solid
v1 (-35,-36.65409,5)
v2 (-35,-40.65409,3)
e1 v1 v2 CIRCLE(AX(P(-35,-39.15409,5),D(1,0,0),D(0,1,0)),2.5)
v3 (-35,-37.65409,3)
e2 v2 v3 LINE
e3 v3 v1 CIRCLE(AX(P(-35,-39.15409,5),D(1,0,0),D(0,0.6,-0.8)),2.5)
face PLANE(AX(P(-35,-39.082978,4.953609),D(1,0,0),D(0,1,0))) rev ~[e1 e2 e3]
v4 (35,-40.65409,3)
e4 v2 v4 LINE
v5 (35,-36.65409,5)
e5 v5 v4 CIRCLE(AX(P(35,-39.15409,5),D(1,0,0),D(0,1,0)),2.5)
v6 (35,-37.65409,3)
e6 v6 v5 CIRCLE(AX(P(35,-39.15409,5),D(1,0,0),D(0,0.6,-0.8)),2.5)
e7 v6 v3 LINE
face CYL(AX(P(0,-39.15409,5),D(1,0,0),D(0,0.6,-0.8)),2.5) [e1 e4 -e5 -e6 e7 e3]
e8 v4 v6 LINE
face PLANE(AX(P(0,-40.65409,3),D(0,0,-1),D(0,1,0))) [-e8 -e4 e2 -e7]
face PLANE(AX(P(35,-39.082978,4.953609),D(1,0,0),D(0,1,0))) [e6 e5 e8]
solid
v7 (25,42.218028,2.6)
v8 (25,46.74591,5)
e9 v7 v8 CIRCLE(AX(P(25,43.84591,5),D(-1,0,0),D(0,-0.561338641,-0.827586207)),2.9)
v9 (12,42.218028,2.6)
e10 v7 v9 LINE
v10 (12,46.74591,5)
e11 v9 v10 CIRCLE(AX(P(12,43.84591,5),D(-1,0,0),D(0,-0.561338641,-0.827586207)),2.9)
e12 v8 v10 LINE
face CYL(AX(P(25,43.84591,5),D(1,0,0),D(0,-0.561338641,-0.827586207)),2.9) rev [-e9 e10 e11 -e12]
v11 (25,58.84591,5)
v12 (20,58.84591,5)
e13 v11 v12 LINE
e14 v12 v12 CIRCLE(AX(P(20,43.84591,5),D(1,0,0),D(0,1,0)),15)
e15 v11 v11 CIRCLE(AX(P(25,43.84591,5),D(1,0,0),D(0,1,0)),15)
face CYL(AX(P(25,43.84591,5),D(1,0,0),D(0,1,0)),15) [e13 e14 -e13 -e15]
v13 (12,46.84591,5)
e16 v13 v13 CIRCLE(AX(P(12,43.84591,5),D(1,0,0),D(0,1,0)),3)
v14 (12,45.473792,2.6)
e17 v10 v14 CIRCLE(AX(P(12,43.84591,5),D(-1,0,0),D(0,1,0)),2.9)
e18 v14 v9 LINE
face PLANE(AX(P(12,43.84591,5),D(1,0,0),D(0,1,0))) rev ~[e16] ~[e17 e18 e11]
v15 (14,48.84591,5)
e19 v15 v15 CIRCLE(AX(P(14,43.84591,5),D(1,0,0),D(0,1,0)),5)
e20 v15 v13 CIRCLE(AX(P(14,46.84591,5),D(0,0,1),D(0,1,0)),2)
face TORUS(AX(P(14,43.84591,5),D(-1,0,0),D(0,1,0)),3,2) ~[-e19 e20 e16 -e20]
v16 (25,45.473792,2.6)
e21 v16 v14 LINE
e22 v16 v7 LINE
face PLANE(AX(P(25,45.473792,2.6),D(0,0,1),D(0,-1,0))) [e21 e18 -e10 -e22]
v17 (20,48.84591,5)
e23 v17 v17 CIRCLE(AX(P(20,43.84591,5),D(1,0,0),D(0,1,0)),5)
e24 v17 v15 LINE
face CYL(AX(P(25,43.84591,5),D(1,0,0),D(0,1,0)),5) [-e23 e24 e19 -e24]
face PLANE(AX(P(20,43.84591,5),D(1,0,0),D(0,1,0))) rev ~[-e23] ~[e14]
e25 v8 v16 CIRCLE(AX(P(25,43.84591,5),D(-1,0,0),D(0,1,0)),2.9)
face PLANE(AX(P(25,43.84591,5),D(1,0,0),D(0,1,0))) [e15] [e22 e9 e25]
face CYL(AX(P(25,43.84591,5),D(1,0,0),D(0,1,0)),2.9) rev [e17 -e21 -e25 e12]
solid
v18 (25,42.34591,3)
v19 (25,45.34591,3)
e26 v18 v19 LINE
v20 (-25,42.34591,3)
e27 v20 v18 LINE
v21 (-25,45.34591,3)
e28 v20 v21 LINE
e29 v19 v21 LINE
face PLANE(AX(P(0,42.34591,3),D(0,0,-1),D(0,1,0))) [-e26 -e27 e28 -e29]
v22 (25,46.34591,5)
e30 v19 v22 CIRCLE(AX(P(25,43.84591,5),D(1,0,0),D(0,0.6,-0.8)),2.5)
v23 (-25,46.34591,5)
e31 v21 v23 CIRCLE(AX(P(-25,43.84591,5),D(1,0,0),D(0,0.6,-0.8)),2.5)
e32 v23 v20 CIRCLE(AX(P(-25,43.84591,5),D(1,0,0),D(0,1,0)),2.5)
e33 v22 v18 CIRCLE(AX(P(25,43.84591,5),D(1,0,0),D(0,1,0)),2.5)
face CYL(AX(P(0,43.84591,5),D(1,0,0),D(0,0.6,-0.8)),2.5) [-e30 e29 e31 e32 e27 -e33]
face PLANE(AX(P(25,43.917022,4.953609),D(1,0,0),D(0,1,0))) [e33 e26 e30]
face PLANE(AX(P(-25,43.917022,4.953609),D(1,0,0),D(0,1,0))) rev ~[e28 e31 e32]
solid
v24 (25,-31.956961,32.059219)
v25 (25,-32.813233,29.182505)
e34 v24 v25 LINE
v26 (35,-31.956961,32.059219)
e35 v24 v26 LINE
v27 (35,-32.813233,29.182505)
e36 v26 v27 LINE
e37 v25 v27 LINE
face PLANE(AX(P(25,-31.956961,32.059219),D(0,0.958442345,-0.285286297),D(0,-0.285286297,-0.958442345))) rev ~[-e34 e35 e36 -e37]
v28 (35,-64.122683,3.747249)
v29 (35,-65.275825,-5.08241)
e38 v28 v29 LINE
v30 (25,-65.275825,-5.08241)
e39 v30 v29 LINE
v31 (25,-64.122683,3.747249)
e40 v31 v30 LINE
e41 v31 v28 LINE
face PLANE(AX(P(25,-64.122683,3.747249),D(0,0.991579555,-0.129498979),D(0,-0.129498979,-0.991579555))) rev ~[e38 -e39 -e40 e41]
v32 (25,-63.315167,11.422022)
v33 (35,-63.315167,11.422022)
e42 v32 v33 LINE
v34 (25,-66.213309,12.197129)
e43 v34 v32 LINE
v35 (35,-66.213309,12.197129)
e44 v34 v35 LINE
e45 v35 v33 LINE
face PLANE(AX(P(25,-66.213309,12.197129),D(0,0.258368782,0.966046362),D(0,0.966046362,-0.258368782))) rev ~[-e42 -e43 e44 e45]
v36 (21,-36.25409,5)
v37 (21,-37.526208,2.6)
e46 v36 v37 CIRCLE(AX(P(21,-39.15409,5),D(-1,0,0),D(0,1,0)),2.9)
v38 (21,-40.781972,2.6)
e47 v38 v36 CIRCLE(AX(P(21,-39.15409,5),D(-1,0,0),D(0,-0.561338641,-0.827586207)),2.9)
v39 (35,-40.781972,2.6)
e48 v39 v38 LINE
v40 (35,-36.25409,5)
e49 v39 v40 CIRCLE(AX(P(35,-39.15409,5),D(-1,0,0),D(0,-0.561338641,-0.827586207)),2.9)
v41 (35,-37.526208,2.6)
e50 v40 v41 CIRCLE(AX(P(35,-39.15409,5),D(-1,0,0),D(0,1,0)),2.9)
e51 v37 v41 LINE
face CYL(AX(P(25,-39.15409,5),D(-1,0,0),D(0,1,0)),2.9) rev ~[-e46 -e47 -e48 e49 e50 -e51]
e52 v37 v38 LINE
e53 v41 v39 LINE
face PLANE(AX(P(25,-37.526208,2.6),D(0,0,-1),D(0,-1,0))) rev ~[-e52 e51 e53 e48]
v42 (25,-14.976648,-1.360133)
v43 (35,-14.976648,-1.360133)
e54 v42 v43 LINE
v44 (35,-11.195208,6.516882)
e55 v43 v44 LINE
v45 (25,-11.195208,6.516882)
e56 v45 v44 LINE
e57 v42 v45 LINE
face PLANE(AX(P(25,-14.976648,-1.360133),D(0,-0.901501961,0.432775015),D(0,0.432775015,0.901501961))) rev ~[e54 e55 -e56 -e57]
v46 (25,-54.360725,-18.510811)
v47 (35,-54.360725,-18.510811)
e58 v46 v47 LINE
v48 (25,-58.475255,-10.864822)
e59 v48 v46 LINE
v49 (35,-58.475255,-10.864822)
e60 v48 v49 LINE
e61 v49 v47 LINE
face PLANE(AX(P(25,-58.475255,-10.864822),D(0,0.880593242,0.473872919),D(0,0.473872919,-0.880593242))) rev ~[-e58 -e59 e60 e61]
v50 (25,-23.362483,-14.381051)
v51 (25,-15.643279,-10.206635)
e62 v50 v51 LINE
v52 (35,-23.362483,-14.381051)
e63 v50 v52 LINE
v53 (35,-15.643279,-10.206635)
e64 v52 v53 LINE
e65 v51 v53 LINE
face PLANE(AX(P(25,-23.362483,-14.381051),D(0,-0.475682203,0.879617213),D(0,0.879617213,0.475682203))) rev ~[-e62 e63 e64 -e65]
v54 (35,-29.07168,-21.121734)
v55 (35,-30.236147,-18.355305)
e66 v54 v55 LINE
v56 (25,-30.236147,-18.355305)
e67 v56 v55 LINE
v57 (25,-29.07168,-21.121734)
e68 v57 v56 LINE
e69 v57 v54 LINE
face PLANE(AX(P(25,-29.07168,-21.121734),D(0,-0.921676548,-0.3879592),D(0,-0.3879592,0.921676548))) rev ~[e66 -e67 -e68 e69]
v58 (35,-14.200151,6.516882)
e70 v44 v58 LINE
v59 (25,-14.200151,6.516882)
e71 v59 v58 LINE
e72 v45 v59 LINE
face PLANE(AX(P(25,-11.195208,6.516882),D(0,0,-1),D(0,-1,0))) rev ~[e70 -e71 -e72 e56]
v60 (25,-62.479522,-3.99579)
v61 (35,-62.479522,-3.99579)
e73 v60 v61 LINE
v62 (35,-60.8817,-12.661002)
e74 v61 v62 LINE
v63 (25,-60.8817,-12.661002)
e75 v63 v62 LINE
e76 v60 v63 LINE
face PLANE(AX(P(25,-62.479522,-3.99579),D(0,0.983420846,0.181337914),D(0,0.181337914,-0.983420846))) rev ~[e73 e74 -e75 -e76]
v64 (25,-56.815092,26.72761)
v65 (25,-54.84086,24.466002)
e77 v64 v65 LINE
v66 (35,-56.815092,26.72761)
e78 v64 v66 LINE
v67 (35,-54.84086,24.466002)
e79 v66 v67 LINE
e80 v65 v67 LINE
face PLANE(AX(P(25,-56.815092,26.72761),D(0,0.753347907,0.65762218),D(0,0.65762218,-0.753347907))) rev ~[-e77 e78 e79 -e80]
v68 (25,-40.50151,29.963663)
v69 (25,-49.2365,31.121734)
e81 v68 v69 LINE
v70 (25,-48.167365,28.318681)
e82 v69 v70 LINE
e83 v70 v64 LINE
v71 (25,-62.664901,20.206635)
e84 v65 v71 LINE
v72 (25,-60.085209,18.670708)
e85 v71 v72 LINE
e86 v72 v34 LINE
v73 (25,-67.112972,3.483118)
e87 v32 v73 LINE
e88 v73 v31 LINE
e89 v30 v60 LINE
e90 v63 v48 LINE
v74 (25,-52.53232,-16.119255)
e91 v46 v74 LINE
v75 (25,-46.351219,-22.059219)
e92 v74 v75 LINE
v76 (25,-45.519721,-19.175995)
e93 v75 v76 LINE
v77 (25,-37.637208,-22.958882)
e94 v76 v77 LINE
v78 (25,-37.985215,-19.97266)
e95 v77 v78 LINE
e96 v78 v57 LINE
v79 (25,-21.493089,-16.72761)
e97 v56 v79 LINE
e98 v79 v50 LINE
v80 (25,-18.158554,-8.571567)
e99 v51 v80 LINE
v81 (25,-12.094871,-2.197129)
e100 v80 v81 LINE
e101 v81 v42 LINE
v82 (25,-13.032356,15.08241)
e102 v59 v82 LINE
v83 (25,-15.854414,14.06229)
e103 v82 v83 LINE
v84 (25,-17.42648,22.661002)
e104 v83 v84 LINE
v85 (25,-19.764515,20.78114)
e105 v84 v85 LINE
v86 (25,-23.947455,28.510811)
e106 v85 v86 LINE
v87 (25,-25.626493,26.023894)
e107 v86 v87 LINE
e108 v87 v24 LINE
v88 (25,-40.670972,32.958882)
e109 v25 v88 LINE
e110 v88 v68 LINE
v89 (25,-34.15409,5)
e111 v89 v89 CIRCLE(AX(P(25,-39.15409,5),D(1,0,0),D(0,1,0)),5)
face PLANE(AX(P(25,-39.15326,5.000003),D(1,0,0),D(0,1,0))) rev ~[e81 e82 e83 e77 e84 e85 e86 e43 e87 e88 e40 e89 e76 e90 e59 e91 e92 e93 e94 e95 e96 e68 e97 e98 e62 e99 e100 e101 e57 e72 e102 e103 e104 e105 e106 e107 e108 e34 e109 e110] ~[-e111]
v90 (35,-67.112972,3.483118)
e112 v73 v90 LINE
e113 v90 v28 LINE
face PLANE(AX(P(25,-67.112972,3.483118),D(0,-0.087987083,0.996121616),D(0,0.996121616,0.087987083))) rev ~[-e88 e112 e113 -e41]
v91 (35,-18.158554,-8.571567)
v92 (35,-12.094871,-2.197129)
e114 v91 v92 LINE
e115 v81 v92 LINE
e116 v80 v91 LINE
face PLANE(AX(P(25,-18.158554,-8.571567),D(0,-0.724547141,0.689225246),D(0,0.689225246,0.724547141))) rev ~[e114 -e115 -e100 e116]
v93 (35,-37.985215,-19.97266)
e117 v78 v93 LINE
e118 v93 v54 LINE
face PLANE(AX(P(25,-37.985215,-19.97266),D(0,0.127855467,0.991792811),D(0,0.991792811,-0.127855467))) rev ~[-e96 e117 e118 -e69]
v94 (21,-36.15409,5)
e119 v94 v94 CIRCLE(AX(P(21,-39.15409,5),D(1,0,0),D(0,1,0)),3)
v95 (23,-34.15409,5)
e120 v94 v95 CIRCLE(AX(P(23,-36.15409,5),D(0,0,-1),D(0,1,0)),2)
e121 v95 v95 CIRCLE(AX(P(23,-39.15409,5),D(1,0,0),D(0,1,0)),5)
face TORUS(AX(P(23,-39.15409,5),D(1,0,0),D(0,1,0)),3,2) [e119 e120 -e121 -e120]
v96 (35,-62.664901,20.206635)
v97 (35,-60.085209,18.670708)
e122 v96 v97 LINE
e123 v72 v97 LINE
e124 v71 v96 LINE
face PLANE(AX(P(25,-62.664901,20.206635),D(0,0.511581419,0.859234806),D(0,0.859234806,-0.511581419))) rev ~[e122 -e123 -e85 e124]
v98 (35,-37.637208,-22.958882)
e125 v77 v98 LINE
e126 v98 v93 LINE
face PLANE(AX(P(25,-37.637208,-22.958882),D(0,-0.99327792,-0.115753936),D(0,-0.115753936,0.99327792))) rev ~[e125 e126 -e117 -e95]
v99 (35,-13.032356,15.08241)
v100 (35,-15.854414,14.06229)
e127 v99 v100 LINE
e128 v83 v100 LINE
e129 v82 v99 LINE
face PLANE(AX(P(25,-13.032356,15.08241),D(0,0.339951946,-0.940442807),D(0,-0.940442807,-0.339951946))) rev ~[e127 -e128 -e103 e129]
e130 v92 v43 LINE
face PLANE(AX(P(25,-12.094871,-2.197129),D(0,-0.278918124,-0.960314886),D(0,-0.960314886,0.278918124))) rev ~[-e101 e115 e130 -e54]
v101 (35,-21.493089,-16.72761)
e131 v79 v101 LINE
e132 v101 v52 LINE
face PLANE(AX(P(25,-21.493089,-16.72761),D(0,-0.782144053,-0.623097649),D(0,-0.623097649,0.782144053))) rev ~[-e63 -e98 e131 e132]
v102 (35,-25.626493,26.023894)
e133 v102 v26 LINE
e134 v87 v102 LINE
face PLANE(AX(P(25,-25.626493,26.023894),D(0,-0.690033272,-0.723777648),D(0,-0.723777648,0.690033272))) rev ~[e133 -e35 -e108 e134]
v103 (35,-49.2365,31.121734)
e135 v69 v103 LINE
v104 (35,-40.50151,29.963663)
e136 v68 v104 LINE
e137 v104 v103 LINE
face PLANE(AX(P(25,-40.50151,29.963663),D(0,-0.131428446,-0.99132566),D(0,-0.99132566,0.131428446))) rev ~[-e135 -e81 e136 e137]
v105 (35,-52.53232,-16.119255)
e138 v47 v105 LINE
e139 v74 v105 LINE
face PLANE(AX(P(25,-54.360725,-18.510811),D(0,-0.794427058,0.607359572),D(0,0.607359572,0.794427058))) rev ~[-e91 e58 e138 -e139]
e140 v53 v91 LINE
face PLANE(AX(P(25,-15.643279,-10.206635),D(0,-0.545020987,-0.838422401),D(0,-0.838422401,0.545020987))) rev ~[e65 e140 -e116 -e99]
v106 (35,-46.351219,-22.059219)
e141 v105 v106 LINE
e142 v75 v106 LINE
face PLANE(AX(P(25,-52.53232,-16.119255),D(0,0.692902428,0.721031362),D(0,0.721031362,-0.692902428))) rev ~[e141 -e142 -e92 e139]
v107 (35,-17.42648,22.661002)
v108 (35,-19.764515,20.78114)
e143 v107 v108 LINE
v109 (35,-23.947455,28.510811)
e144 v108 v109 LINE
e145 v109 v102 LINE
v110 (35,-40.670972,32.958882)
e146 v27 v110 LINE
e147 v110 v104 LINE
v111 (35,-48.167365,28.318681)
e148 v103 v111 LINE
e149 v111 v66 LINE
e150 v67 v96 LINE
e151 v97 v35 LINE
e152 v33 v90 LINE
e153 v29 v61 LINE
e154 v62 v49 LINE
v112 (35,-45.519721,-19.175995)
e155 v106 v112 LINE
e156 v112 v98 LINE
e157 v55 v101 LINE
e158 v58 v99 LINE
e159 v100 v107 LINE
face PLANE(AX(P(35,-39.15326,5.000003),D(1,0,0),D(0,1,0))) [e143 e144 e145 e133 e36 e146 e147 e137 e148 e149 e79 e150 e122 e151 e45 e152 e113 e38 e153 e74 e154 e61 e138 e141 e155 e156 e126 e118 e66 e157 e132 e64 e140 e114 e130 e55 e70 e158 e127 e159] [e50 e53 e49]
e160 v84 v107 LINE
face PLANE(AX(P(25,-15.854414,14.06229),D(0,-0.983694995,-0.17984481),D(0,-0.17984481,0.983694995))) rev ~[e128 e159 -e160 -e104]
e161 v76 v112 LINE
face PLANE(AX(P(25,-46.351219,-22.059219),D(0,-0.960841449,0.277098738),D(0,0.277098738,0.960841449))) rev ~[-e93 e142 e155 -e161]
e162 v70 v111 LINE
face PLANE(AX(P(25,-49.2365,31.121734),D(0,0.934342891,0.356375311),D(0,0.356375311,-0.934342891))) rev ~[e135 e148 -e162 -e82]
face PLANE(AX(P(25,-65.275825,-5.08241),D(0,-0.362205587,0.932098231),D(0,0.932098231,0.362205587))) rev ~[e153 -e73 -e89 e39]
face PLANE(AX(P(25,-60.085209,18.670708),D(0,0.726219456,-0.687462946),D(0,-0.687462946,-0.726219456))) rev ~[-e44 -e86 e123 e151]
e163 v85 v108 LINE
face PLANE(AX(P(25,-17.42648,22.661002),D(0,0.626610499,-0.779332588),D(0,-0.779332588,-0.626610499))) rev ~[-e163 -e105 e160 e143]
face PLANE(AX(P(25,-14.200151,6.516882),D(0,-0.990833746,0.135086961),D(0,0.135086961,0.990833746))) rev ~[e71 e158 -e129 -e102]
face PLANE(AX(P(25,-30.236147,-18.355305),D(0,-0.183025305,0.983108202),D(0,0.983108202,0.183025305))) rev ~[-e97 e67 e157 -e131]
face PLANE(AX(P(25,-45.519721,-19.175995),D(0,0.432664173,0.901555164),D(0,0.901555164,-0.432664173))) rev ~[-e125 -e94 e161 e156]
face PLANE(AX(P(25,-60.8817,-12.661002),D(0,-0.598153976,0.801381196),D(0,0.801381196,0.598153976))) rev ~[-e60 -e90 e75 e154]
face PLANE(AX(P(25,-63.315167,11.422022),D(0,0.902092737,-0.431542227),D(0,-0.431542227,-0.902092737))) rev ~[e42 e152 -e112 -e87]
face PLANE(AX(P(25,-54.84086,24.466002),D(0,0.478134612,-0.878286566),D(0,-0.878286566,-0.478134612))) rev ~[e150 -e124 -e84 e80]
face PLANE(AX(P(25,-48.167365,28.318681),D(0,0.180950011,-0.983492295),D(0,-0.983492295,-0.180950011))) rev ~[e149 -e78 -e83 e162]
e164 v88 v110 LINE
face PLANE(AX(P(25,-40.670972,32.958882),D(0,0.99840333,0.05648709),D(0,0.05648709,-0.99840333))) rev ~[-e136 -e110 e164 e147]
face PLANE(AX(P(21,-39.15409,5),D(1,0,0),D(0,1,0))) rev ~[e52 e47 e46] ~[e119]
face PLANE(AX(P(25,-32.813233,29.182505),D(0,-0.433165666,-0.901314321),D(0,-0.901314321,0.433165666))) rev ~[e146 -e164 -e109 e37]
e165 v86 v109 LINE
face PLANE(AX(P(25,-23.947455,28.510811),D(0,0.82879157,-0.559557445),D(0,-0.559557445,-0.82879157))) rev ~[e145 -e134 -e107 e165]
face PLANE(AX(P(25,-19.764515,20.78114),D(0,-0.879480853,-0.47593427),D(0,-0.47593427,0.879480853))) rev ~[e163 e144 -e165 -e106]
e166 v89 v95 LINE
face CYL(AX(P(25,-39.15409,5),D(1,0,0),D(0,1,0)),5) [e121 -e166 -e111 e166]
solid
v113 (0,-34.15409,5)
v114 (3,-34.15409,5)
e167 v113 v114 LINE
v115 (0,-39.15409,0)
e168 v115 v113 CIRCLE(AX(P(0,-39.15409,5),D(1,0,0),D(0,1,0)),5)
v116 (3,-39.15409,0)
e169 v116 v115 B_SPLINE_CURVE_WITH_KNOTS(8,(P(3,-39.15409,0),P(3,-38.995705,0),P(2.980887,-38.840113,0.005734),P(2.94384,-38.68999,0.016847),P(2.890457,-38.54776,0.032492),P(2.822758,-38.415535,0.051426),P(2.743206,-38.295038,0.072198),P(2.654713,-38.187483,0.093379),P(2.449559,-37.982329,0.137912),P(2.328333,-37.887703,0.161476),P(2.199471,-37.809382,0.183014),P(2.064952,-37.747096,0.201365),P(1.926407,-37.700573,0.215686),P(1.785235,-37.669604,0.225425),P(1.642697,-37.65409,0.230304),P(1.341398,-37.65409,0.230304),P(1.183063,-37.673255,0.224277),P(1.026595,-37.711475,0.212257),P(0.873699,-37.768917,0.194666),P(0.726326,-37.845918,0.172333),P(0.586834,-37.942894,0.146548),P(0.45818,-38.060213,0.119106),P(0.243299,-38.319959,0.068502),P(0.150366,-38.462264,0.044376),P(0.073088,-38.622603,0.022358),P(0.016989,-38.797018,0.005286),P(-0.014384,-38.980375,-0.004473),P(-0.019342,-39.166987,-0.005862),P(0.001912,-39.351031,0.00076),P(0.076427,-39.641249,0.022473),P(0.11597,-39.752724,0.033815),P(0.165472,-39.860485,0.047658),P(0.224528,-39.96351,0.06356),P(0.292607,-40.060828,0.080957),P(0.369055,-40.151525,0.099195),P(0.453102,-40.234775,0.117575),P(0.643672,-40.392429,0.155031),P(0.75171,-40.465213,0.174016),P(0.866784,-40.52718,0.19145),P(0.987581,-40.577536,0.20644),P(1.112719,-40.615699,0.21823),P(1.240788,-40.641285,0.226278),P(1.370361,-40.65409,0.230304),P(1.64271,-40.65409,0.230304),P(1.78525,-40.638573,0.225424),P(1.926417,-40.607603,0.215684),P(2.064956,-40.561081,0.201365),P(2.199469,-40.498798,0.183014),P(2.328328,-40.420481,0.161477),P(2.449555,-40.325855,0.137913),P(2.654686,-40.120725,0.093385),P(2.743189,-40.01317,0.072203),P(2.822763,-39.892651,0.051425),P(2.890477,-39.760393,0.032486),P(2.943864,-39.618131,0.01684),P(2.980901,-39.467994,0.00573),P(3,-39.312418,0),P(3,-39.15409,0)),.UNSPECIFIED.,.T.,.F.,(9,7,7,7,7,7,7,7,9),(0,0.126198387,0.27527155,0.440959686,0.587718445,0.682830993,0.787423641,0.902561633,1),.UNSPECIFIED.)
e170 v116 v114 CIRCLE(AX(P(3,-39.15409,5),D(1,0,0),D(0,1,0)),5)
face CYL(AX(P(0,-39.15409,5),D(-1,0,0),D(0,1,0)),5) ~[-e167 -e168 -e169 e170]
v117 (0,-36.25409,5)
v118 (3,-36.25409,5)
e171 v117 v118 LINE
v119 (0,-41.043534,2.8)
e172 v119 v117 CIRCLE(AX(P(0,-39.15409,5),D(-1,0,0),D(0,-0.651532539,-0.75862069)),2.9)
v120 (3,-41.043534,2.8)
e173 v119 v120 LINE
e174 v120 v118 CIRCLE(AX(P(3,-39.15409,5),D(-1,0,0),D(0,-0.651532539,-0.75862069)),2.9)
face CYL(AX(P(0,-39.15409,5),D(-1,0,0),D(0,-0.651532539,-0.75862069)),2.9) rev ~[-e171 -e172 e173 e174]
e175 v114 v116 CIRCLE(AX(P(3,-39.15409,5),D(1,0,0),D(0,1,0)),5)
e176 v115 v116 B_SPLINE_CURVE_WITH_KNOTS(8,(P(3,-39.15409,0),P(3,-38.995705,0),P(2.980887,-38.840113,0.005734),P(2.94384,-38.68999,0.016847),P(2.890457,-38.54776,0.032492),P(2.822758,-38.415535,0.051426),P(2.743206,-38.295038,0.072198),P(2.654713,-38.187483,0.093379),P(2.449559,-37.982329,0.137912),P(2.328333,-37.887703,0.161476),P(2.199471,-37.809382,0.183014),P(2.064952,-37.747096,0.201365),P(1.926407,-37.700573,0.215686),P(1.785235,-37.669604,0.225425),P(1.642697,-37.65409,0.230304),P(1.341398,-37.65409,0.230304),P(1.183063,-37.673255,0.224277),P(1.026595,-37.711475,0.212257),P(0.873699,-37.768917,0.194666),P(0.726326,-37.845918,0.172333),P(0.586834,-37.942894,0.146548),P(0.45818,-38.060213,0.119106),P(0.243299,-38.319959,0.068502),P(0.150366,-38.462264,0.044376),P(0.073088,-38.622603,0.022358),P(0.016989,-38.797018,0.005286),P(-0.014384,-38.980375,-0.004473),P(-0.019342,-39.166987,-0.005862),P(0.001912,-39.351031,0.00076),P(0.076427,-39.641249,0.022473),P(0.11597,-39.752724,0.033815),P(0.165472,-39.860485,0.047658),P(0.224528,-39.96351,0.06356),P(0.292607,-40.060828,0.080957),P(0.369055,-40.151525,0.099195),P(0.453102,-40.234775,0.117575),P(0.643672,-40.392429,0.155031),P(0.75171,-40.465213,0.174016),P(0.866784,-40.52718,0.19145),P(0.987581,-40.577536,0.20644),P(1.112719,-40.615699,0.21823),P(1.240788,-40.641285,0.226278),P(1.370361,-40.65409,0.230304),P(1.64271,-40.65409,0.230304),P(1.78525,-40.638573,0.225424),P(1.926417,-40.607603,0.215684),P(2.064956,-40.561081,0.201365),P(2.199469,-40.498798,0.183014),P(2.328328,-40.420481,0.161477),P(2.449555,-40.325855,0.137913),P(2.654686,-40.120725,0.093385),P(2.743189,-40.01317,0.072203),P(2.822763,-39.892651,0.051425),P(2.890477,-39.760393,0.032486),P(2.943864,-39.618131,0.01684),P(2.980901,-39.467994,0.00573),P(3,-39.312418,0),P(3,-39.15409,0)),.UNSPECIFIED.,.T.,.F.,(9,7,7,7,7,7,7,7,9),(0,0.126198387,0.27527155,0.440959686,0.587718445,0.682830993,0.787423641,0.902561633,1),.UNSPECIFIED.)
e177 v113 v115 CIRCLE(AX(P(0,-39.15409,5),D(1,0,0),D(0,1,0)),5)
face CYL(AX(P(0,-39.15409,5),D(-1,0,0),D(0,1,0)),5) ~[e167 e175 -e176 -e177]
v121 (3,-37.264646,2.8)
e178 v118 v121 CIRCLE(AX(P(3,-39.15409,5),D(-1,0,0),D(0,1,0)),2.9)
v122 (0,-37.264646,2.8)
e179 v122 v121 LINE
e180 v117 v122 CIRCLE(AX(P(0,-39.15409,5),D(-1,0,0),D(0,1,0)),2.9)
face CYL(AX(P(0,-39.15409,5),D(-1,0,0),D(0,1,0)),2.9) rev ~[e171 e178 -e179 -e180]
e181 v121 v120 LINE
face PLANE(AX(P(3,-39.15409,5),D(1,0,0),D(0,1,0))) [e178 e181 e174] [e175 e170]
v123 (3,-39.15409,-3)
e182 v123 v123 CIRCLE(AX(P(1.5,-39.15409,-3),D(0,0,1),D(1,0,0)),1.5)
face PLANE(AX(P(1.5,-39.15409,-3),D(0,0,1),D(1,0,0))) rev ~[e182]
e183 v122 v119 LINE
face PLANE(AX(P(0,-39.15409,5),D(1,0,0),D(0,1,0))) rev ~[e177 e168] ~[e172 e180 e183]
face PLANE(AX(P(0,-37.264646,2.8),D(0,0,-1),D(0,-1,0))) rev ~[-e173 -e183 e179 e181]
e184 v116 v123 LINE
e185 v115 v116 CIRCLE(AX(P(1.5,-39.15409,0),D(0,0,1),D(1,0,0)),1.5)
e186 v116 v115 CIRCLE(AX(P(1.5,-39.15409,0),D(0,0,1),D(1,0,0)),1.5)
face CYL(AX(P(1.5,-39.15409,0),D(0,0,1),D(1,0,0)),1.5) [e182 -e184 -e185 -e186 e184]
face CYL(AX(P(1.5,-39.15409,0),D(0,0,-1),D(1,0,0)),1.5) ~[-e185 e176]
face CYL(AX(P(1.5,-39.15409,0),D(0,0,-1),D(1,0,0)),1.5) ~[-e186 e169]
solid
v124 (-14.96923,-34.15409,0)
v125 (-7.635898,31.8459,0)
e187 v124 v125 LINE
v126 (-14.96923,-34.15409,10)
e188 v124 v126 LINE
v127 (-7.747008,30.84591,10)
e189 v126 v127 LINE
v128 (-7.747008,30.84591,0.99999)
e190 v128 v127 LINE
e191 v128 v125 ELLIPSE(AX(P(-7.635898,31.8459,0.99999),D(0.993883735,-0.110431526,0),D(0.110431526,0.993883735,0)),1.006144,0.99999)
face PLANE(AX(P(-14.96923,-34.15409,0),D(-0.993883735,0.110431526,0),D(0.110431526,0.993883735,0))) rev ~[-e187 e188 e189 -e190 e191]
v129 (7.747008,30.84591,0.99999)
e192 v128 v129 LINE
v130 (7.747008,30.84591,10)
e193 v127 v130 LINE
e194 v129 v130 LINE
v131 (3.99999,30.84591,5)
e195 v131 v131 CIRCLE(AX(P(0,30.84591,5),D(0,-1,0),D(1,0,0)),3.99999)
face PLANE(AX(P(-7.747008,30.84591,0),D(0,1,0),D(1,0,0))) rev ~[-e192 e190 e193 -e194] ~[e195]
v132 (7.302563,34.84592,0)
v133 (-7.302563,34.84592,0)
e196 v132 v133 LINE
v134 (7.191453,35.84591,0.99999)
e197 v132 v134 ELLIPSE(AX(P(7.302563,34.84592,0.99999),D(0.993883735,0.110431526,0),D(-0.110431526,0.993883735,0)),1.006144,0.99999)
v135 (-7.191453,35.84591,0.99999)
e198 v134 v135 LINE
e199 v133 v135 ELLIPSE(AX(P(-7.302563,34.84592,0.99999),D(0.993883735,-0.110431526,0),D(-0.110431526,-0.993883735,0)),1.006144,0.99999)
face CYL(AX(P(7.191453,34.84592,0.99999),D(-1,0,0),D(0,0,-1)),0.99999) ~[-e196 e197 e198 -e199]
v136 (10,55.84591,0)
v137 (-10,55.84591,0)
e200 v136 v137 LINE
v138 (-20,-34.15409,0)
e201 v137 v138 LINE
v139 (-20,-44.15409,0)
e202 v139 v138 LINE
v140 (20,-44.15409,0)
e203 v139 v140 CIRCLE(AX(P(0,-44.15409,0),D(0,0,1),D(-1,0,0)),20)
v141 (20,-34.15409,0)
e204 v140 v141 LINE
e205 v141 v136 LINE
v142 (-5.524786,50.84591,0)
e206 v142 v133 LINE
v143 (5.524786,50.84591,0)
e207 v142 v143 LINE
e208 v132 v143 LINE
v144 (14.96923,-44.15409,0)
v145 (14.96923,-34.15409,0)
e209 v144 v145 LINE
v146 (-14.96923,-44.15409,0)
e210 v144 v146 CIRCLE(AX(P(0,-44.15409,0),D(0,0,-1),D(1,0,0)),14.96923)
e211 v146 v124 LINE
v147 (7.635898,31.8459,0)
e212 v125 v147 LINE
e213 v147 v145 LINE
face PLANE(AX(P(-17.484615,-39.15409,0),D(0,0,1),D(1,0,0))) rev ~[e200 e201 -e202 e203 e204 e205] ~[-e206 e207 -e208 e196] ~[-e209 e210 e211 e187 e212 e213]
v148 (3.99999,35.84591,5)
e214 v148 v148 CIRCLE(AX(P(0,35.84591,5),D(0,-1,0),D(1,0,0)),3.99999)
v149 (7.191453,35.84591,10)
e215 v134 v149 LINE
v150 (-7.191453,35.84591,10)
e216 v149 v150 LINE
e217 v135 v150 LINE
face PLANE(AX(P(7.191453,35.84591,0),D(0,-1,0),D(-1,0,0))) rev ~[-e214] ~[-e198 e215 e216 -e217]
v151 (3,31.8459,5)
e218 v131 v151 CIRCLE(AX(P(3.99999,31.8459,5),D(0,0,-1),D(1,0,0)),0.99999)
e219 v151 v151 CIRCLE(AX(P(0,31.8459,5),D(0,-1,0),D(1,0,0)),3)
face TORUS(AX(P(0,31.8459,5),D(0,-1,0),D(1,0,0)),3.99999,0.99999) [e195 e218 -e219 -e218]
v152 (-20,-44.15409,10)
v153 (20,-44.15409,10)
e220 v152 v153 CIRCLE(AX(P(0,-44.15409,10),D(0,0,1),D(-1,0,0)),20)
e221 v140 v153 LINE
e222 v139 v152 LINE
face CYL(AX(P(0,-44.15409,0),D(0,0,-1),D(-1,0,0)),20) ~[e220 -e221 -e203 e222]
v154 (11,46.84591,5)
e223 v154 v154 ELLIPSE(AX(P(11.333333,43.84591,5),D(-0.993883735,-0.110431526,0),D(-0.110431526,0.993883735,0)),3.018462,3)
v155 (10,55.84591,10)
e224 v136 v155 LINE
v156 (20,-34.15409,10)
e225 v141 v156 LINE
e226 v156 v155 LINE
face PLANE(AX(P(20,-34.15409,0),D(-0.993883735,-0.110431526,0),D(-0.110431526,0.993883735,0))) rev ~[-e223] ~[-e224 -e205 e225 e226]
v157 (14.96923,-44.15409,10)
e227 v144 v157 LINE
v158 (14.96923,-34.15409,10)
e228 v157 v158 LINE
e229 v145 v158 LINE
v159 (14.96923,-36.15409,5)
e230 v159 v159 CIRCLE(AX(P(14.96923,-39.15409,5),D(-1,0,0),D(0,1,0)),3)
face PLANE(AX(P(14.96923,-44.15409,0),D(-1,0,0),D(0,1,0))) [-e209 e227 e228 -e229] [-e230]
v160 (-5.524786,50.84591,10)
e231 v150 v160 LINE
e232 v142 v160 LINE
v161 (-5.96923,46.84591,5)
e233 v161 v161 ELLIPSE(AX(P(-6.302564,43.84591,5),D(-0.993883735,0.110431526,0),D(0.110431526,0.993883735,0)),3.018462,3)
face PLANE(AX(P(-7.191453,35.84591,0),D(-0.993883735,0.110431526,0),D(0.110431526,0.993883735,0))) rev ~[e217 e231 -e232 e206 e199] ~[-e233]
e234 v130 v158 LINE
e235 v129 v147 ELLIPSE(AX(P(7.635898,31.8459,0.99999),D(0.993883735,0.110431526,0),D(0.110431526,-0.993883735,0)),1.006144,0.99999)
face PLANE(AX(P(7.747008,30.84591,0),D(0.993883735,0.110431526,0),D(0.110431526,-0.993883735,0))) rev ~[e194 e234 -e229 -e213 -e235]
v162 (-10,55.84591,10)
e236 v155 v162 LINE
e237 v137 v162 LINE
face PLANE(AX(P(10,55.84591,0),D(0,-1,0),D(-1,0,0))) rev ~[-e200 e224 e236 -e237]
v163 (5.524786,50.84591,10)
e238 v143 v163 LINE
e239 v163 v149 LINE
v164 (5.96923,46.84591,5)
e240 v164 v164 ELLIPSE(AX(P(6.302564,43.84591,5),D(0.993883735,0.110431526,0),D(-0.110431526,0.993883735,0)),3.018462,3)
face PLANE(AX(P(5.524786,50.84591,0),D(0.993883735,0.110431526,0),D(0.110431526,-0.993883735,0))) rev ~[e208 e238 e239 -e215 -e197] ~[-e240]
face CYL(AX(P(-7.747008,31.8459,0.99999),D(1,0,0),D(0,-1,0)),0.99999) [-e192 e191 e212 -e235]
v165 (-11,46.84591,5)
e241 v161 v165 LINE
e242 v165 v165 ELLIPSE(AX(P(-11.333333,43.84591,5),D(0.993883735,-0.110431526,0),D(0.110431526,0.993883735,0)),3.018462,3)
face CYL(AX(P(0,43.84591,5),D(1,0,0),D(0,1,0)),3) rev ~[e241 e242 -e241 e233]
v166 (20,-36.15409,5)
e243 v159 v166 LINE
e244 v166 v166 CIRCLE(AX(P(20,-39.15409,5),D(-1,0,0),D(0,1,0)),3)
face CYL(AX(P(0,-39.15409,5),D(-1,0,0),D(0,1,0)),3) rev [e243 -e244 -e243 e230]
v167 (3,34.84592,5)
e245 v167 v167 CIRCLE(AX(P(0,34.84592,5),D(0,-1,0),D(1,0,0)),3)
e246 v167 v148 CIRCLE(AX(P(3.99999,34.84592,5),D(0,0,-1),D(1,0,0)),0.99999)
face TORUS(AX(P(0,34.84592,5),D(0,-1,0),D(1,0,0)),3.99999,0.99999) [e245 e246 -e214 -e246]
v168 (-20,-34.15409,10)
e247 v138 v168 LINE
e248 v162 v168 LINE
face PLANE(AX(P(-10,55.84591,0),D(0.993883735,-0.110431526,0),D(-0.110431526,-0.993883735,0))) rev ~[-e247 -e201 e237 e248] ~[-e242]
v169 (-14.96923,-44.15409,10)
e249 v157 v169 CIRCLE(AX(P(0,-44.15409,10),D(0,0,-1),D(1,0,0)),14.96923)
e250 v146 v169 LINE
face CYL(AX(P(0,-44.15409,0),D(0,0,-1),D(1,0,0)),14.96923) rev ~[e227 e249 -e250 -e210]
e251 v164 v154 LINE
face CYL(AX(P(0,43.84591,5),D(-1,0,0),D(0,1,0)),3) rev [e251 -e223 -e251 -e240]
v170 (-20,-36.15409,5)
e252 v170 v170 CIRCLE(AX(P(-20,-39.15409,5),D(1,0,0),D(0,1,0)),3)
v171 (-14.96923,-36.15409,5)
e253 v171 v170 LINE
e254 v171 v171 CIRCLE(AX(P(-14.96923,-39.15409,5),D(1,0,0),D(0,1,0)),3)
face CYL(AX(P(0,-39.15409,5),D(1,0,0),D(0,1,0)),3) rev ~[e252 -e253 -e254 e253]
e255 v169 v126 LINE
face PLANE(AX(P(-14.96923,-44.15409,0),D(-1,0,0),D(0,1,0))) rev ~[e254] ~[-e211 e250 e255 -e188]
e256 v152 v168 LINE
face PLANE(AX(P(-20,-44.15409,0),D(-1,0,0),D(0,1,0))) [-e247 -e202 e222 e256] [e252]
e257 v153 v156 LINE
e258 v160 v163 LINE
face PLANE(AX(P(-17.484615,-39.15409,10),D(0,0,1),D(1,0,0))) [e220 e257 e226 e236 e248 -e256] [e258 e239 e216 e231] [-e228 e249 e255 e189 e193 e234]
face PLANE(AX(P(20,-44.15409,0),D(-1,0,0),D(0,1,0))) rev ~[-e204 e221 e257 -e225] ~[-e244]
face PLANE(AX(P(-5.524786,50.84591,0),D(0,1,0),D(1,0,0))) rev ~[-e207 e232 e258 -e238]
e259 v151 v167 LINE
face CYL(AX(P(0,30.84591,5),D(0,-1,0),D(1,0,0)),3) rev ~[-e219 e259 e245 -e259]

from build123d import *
from build123d import SkipClean  # not in build123d's __all__

# Parameters (mm, degrees)
F0_W           = 5.0307695212
F0_H           = 10
F1_DEPTH       = 10
F2_R           = 3
F3_DEPTH       = 25
F3_DEPTH_BACK  = 25
F4_R           = 3
F5_DEPTH       = 6
F6_R           = 0.99999
F7_DEPTH       = 25
F7_DEPTH_BACK  = 25
F8_DEPTH       = 35
F8_DEPTH_BACK  = 35
F10_R          = 5
F11_DEPTH      = 13
F10_R_2        = 15
F12_DEPTH      = 5
F13_DEPTH      = 4
F14_DEPTH      = 10
F15_R          = 2
F15_2_R        = 2
F2_R_2         = 5
F16_DEPTH      = 3
F17_R          = 1.5
F18_DEPTH      = 1
F18_DEPTH_BACK = 3


# Not quite as in the source:
# - a fillet or chamfer is up to 0.001 mm smaller than in the source, because OpenCascade refuses the exact size


with BuildPart() as f1:
    # F0 (on Top) → F1 (new body)
    with BuildSketch(Plane.XY):
        with Locations((-17.4846152394, -39.1540901363)):
            Rectangle(F0_W, F0_H)
        with Locations((17.4846152394, -39.1540901363)):
            Rectangle(F0_W, F0_H)
        Polygon((10, 55.8459098637), (-10, 55.8459098637), (-10, 50.8459098637), (-5.5247860344, 50.8459098637), (5.5247860344, 50.8459098637), (10, 50.8459098637), align=None)
        Polygon((7.7470082566, 30.8459098637), (14.9692304788, -34.1540901363), (20, -34.1540901363), (10, 55.8459098637), (10, 50.8459098637), (5.5247860344, 50.8459098637), (7.191452701, 35.8459098637), (7.7470082566, 35.8459098637), align=None)
        Polygon((-10, 55.8459098637), (-20, -34.1540901363), (-14.9692304788, -34.1540901363), (-7.7470082566, 30.8459098637), (-7.7470082566, 35.8459098637), (-7.191452701, 35.8459098637), (-5.5247860344, 50.8459098637), (-10, 50.8459098637), align=None)
        Polygon((-7.191452701, 35.8459098637), (-7.7470082566, 30.8459098637), (7.7470082566, 30.8459098637), (7.191452701, 35.8459098637), align=None)
        Polygon((-7.7470082566, 35.8459098637), (-7.7470082566, 30.8459098637), (-7.191452701, 35.8459098637), align=None)
        Polygon((7.191452701, 35.8459098637), (7.7470082566, 30.8459098637), (7.7470082566, 35.8459098637), align=None)
        with BuildLine():
            Line((-14.9692304788, -44.1540901363), (-20, -44.1540901363))
            ThreePointArc((-20, -44.1540901363), (0, -64.1540901363), (20, -44.1540901363))
            Line((20, -44.1540901363), (14.9692304788, -44.1540901363))
            ThreePointArc((14.9692304788, -44.1540901363), (0, -59.1233206151), (-14.9692304788, -44.1540901363))
        make_face()
    extrude(amount=F1_DEPTH)

    # F2 (on Right) → F3 (cut, two sides)
    with BuildSketch(Plane.YZ) as f3_sk:
        with Locations((-39.1540901363, 5)):
            Circle(F2_R)
        with BuildLine():
            ThreePointArc((-37.2646457735, 2.8), (-39.1540901363, 2.1), (-41.0435344991, 2.8))
            ThreePointArc((-41.0435344991, 2.8), (-40.3645882462, 7.6352787947), (-36.2540901363, 5))
            ThreePointArc((-36.2540901363, 5), (-36.5188113415, 3.7895018901), (-37.2646457735, 2.8))
        make_face(mode=Mode.SUBTRACT)
        with Locations((43.8459098637, 5)):
            Circle(F2_R)
        with BuildLine():
            ThreePointArc((42.3459098637, 3), (42.727875875, 7.2360679775), (46.3459098637, 5))
            ThreePointArc((46.3459098637, 5), (46.0819778412, 3.8819660113), (45.3459098637, 3))
            ThreePointArc((45.3459098637, 3), (43.8459098637, 2.5), (42.3459098637, 3))
        make_face(mode=Mode.SUBTRACT)
        with BuildLine():
            ThreePointArc((-37.6540901363, 3), (-36.9180221588, 3.8819660113), (-36.6540901363, 5))
            ThreePointArc((-36.6540901363, 5), (-40.272124125, 7.2360679775), (-40.6540901363, 3))
            Line((-40.6540901363, 3), (-37.6540901363, 3))
        make_face()
        with BuildLine():
            ThreePointArc((45.3459098637, 3), (46.0819778412, 3.8819660113), (46.3459098637, 5))
            ThreePointArc((46.3459098637, 5), (42.727875875, 7.2360679775), (42.3459098637, 3))
            Line((42.3459098637, 3), (45.3459098637, 3))
        make_face()
        with BuildLine():
            Line((45.3459098637, 3), (42.3459098637, 3))
            ThreePointArc((42.3459098637, 3), (43.8459098637, 2.5), (45.3459098637, 3))
        make_face()
        with BuildLine():
            ThreePointArc((-40.6540901363, 3), (-40.272124125, 7.2360679775), (-36.6540901363, 5))
            ThreePointArc((-36.6540901363, 5), (-36.9180221588, 3.8819660113), (-37.6540901363, 3))
            ThreePointArc((-37.6540901363, 3), (-37.8066571485, 2.8941927098), (-37.9666559276, 2.8))
            Line((-37.9666559276, 2.8), (-37.2646457735, 2.8))
            ThreePointArc((-37.2646457735, 2.8), (-36.5188113415, 3.7895018901), (-36.2540901363, 5))
            ThreePointArc((-36.2540901363, 5), (-40.3645882462, 7.6352787947), (-41.0435344991, 2.8))
            Line((-41.0435344991, 2.8), (-40.341524345, 2.8))
            ThreePointArc((-40.341524345, 2.8), (-40.5015231241, 2.8941927098), (-40.6540901363, 3))
        make_face()
        with BuildLine():
            Line((-37.6540901363, 3), (-40.6540901363, 3))
            ThreePointArc((-40.6540901363, 3), (-40.5015231241, 2.8941927098), (-40.341524345, 2.8))
            Line((-40.341524345, 2.8), (-37.9666559276, 2.8))
            ThreePointArc((-37.9666559276, 2.8), (-37.8066571485, 2.8941927098), (-37.6540901363, 3))
        make_face()
        with BuildLine():
            ThreePointArc((-37.9666559276, 2.8), (-39.1540901363, 2.5), (-40.341524345, 2.8))
            Line((-40.341524345, 2.8), (-41.0435344991, 2.8))
            ThreePointArc((-41.0435344991, 2.8), (-39.1540901363, 2.1), (-37.2646457735, 2.8))
            Line((-37.2646457735, 2.8), (-37.9666559276, 2.8))
        make_face()
        with BuildLine():
            Line((-37.9666559276, 2.8), (-40.341524345, 2.8))
            ThreePointArc((-40.341524345, 2.8), (-39.1540901363, 2.5), (-37.9666559276, 2.8))
        make_face()
    extrude(amount=-F3_DEPTH, mode=Mode.SUBTRACT)
    extrude(f3_sk.sketch, amount=F3_DEPTH_BACK, mode=Mode.SUBTRACT)

    # F4 (on face) → F5 (cut)
    with BuildSketch(Plane.XZ.offset(-30.8459098637)):
        with Locations((0, 5)):
            Circle(F4_R)
    extrude(amount=-F5_DEPTH, mode=Mode.SUBTRACT)

    # F6 (radius 1 in the source; OpenCascade refuses exactly that, so slightly less here)
    f6_edges = [f1.edges().sort_by_distance(p)[0] for p in [
        (-3, 30.84591, 5),
        (-3, 35.84591, 5),
        (0, 35.84591, 0),
        (0, 30.84591, 0),
    ]]
    fillet(f6_edges, radius=F6_R)


with BuildPart() as f7:
    # F2 (on Right) → F7 (new body, two sides)
    with BuildSketch(Plane.YZ) as f7_sk:
        with BuildLine():
            ThreePointArc((45.3459098637, 3), (46.0819778412, 3.8819660113), (46.3459098637, 5))
            ThreePointArc((46.3459098637, 5), (42.727875875, 7.2360679775), (42.3459098637, 3))
            Line((42.3459098637, 3), (45.3459098637, 3))
        make_face()
    extrude(amount=F7_DEPTH)
    extrude(f7_sk.sketch, amount=-F7_DEPTH_BACK)


with BuildPart() as f8:
    # F2 (on Right) → F8 (new body, two sides)
    with BuildSketch(Plane.YZ) as f8_sk:
        with BuildLine():
            ThreePointArc((-37.6540901363, 3), (-36.9180221588, 3.8819660113), (-36.6540901363, 5))
            ThreePointArc((-36.6540901363, 5), (-40.272124125, 7.2360679775), (-40.6540901363, 3))
            Line((-40.6540901363, 3), (-37.6540901363, 3))
        make_face()
    extrude(amount=F8_DEPTH)
    extrude(f8_sk.sketch, amount=-F8_DEPTH_BACK)


with BuildPart() as f11:
    # F10 (on offset) → F11 (new body)
    with BuildSketch(Plane.YZ.offset(25)):
        with Locations((43.8459098637, 5)):
            Circle(F10_R)
        with BuildLine():
            ThreePointArc((42.2180278041, 2.6), (42.4877600143, 7.5623093073), (46.7459098637, 5))
            ThreePointArc((46.7459098637, 5), (46.408219171, 3.6418501505), (45.4737919233, 2.6))
            ThreePointArc((45.4737919233, 2.6), (43.8459098637, 2.1), (42.2180278041, 2.6))
        make_face(mode=Mode.SUBTRACT)
        with BuildLine():
            Line((45.4737919233, 2.6), (42.2180278041, 2.6))
            ThreePointArc((42.2180278041, 2.6), (43.8459098637, 2.1), (45.4737919233, 2.6))
        make_face()
    extrude(amount=-F11_DEPTH)

    # F10 (on offset) → F12 (join)
    with BuildSketch(Plane.YZ.offset(25)):
        with Locations((43.8459098637, 5)):
            Circle(F10_R_2)
        with Locations((43.8459098637, 5)):
            Circle(F10_R, mode=Mode.SUBTRACT)
    extrude(amount=-F12_DEPTH)

    # F15
    f15_edges = [f11.edges().sort_by_distance(p)[0] for p in [
        (12, 38.84591, 5),
    ]]
    fillet(f15_edges, radius=F15_R)


with BuildPart() as f13:
    # F10 (on offset) → F13 (new body)
    with BuildSketch(Plane.YZ.offset(25)):
        with Locations((-39.1540901363, 5)):
            Circle(F10_R)
        with BuildLine():
            ThreePointArc((-40.7819721959, 2.6), (-40.5122399857, 7.5623093073), (-36.2540901363, 5))
            ThreePointArc((-36.2540901363, 5), (-36.591780829, 3.6418501505), (-37.5262080767, 2.6))
            ThreePointArc((-37.5262080767, 2.6), (-39.1540901363, 2.1), (-40.7819721959, 2.6))
        make_face(mode=Mode.SUBTRACT)
        with BuildLine():
            Line((-37.5262080767, 2.6), (-40.7819721959, 2.6))
            ThreePointArc((-40.7819721959, 2.6), (-39.1540901363, 2.1), (-37.5262080767, 2.6))
        make_face()
    extrude(amount=-F13_DEPTH)

    # F10 (on offset) → F14 (join)
    with BuildSketch(Plane.YZ.offset(25)):
        with BuildLine():
            ThreePointArc((-14.9766480513, -1.3601331924), (-14.3605823961, 1.7934482794), (-14.1540901363, 5))
            ThreePointArc((-14.1540901363, 5), (-14.1656080498, 5.7587904942), (-14.2001511774, 6.5168818137))
            ThreePointArc((-14.2001511774, 6.5168818137), (-14.7340955947, 10.3538646405), (-15.8544142437, 14.0622901797))
            ThreePointArc((-15.8544142437, 14.0622901797), (-17.5467124817, 17.5746264712), (-19.764515266, 20.7811402107))
            ThreePointArc((-19.764515266, 20.7811402107), (-22.4880569089, 23.6344663584), (-25.6264934276, 26.0238941989))
            ThreePointArc((-25.6264934276, 26.0238941989), (-29.0951104494, 27.887047159), (-32.8132327049, 29.182504565))
            ThreePointArc((-32.8132327049, 29.182504565), (-36.6270055915, 29.8719489325), (-40.5015101711, 29.9636627771))
            ThreePointArc((-40.5015101711, 29.9636627771), (-44.3993250567, 29.4435576508), (-48.1673646879, 28.3186809631))
            ThreePointArc((-48.1673646879, 28.3186809631), (-51.6534434584, 26.6510084414), (-54.8408601441, 24.4660023303))
            ThreePointArc((-54.8408601441, 24.4660023303), (-57.6909133357, 21.7745696121), (-60.085209418, 18.6707075755))
            ThreePointArc((-60.085209418, 18.6707075755), (-61.9896413023, 15.1753428908), (-63.3151669338, 11.4220221103))
            ThreePointArc((-63.3151669338, 11.4220221103), (-64.0168461692, 7.6159821196), (-64.1226827269, 3.7472494093))
            ThreePointArc((-64.1226827269, 3.7472494093), (-63.609495659, -0.1897148977), (-62.4795217853, -3.995790037))
            ThreePointArc((-62.4795217853, -3.995790037), (-60.752213979, -7.5905141466), (-58.475255219, -10.8648220868))
            ThreePointArc((-58.475255219, -10.8648220868), (-55.7135250048, -13.7292583098), (-52.5323204955, -16.1192554901))
            ThreePointArc((-52.5323204955, -16.1192554901), (-49.1436313044, -17.9174402421), (-45.5197214589, -19.175995075))
            ThreePointArc((-45.5197214589, -19.175995075), (-41.7828229709, -19.8614111362), (-37.9852146111, -19.9726596502))
            ThreePointArc((-37.9852146111, -19.9726596502), (-34.0462591754, -19.4726390664), (-30.2361468593, -18.3553053439))
            ThreePointArc((-30.2361468593, -18.3553053439), (-26.6405314571, -16.6428013247), (-23.3624825469, -14.3810507905))
            ThreePointArc((-23.3624825469, -14.3810507905), (-20.5325698167, -11.6804970246), (-18.1585535179, -8.5715674152))
            ThreePointArc((-18.1585535179, -8.5715674152), (-16.281602359, -5.0920415614), (-14.9766480513, -1.3601331924))
        make_face()
        with Locations((-39.1540901363, 5)):
            Circle(F10_R, mode=Mode.SUBTRACT)
        with Locations((-39.1540901363, 5)):
            Circle(F10_R)
        with BuildLine():
            ThreePointArc((-40.7819721959, 2.6), (-40.5122399857, 7.5623093073), (-36.2540901363, 5))
            ThreePointArc((-36.2540901363, 5), (-36.591780829, 3.6418501505), (-37.5262080767, 2.6))
            ThreePointArc((-37.5262080767, 2.6), (-39.1540901363, 2.1), (-40.7819721959, 2.6))
        make_face(mode=Mode.SUBTRACT)
        with BuildLine():
            Line((-37.5262080767, 2.6), (-40.7819721959, 2.6))
            ThreePointArc((-40.7819721959, 2.6), (-39.1540901363, 2.1), (-37.5262080767, 2.6))
        make_face()
        with BuildLine():
            ThreePointArc((-63.3151669338, 11.4220221103), (-61.9896413023, 15.1753428908), (-60.085209418, 18.6707075755))
            Line((-60.085209418, 18.6707075755), (-66.2133090863, 12.1971292759))
            Line((-66.2133090863, 12.1971292759), (-63.3151669338, 11.4220221103))
        make_face()
        with BuildLine():
            ThreePointArc((-60.085209418, 18.6707075755), (-57.6909133357, 21.7745696121), (-54.8408601441, 24.4660023303))
            Line((-54.8408601441, 24.4660023303), (-62.6649013876, 20.2066352065))
            Line((-62.6649013876, 20.2066352065), (-60.085209418, 18.6707075755))
        make_face()
        with BuildLine():
            ThreePointArc((-54.8408601441, 24.4660023303), (-51.6534434584, 26.6510084414), (-48.1673646879, 28.3186809631))
            Line((-48.1673646879, 28.3186809631), (-56.8150916742, 26.7276097323))
            Line((-56.8150916742, 26.7276097323), (-54.8408601441, 24.4660023303))
        make_face()
        with BuildLine():
            ThreePointArc((-48.1673646879, 28.3186809631), (-44.3993250567, 29.4435576508), (-40.5015101711, 29.9636627771))
            Line((-40.5015101711, 29.9636627771), (-49.2365000788, 31.1217344323))
            Line((-49.2365000788, 31.1217344323), (-48.1673646879, 28.3186809631))
        make_face()
        with BuildLine():
            ThreePointArc((-64.1226827269, 3.7472494093), (-64.0168461692, 7.6159821196), (-63.3151669338, 11.4220221103))
            Line((-63.3151669338, 11.4220221103), (-67.1129719015, 3.4831181863))
            Line((-67.1129719015, 3.4831181863), (-64.1226827269, 3.7472494093))
        make_face()
        with BuildLine():
            Line((-65.2758245686, -5.0824099425), (-62.4795217853, -3.995790037))
            ThreePointArc((-62.4795217853, -3.995790037), (-63.609495659, -0.1897148977), (-64.1226827269, 3.7472494093))
            Line((-64.1226827269, 3.7472494093), (-65.2758245686, -5.0824099425))
        make_face()
        with BuildLine():
            Line((-60.8816998686, -12.6610015379), (-58.475255219, -10.8648220868))
            ThreePointArc((-58.475255219, -10.8648220868), (-60.752213979, -7.5905141466), (-62.4795217853, -3.995790037))
            Line((-62.4795217853, -3.995790037), (-60.8816998686, -12.6610015379))
        make_face()
        with BuildLine():
            Line((-54.3607253428, -18.5108112513), (-52.5323204955, -16.1192554901))
            ThreePointArc((-52.5323204955, -16.1192554901), (-55.7135250048, -13.7292583098), (-58.475255219, -10.8648220868))
            Line((-58.475255219, -10.8648220868), (-54.3607253428, -18.5108112513))
        make_face()
        with BuildLine():
            Line((-46.3512194121, -22.05921895), (-45.5197214589, -19.175995075))
            ThreePointArc((-45.5197214589, -19.175995075), (-49.1436313044, -17.9174402421), (-52.5323204955, -16.1192554901))
            Line((-52.5323204955, -16.1192554901), (-46.3512194121, -22.05921895))
        make_face()
        with BuildLine():
            Line((-37.6372083226, -22.9588817653), (-37.9852146111, -19.9726596502))
            ThreePointArc((-37.9852146111, -19.9726596502), (-41.7828229709, -19.8614111362), (-45.5197214589, -19.175995075))
            Line((-45.5197214589, -19.175995075), (-37.6372083226, -22.9588817653))
        make_face()
        with BuildLine():
            Line((-29.0716801938, -21.1217344323), (-30.2361468593, -18.3553053439))
            ThreePointArc((-30.2361468593, -18.3553053439), (-34.0462591754, -19.4726390664), (-37.9852146111, -19.9726596502))
            Line((-37.9852146111, -19.9726596502), (-29.0716801938, -21.1217344323))
        make_face()
        with BuildLine():
            Line((-21.4930885984, -16.7276097323), (-23.3624825469, -14.3810507905))
            ThreePointArc((-23.3624825469, -14.3810507905), (-26.6405314571, -16.6428013247), (-30.2361468593, -18.3553053439))
            Line((-30.2361468593, -18.3553053439), (-21.4930885984, -16.7276097323))
        make_face()
        with BuildLine():
            Line((-15.6432788849, -10.2066352065), (-18.1585535179, -8.5715674152))
            ThreePointArc((-18.1585535179, -8.5715674152), (-20.5325698167, -11.6804970246), (-23.3624825469, -14.3810507905))
            Line((-23.3624825469, -14.3810507905), (-15.6432788849, -10.2066352065))
        make_face()
        with BuildLine():
            Line((-12.0948711862, -2.1971292759), (-14.9766480513, -1.3601331924))
            ThreePointArc((-14.9766480513, -1.3601331924), (-16.281602359, -5.0920415614), (-18.1585535179, -8.5715674152))
            Line((-18.1585535179, -8.5715674152), (-12.0948711862, -2.1971292759))
        make_face()
        with BuildLine():
            ThreePointArc((-14.2001511774, 6.5168818137), (-14.1656080498, 5.7587904942), (-14.1540901363, 5))
            ThreePointArc((-14.1540901363, 5), (-14.3605823961, 1.7934482794), (-14.9766480513, -1.3601331924))
            Line((-14.9766480513, -1.3601331924), (-11.195208371, 6.5168818137))
            Line((-11.195208371, 6.5168818137), (-14.2001511774, 6.5168818137))
        make_face()
        with BuildLine():
            ThreePointArc((-15.8544142437, 14.0622901797), (-14.7340955947, 10.3538646405), (-14.2001511774, 6.5168818137))
            Line((-14.2001511774, 6.5168818137), (-13.032355704, 15.0824099425))
            Line((-13.032355704, 15.0824099425), (-15.8544142437, 14.0622901797))
        make_face()
        with BuildLine():
            ThreePointArc((-19.764515266, 20.7811402107), (-17.5467124817, 17.5746264712), (-15.8544142437, 14.0622901797))
            Line((-15.8544142437, 14.0622901797), (-17.426480404, 22.6610015379))
            Line((-17.426480404, 22.6610015379), (-19.764515266, 20.7811402107))
        make_face()
        with BuildLine():
            ThreePointArc((-25.6264934276, 26.0238941989), (-22.4880569089, 23.6344663584), (-19.764515266, 20.7811402107))
            Line((-19.764515266, 20.7811402107), (-23.9474549298, 28.5108112513))
            Line((-23.9474549298, 28.5108112513), (-25.6264934276, 26.0238941989))
        make_face()
        with BuildLine():
            ThreePointArc((-32.8132327049, 29.182504565), (-29.0951104494, 27.887047159), (-25.6264934276, 26.0238941989))
            Line((-25.6264934276, 26.0238941989), (-31.9569608604, 32.05921895))
            Line((-31.9569608604, 32.05921895), (-32.8132327049, 29.182504565))
        make_face()
        with BuildLine():
            ThreePointArc((-40.5015101711, 29.9636627771), (-36.6270055915, 29.8719489325), (-32.8132327049, 29.182504565))
            Line((-32.8132327049, 29.182504565), (-40.6709719499, 32.9588817653))
            Line((-40.6709719499, 32.9588817653), (-40.5015101711, 29.9636627771))
        make_face()
    extrude(amount=F14_DEPTH)

    # F15#2
    f15_2_edges = [f13.edges().sort_by_distance(p)[0] for p in [
        (21, -44.15409, 5),
    ]]
    fillet(f15_2_edges, radius=F15_2_R)


with BuildPart() as f16:
    # F2 (on Right) → F16 (new body)
    with BuildSketch(Plane.YZ):
        with Locations((-39.1540901363, 5)):
            Circle(F2_R_2)
        with Locations((-39.1540901363, 5)):
            Circle(F2_R, mode=Mode.SUBTRACT)
        with Locations((-39.1540901363, 5)):
            Circle(F2_R)
        with BuildLine():
            ThreePointArc((-37.2646457735, 2.8), (-39.1540901363, 2.1), (-41.0435344991, 2.8))
            ThreePointArc((-41.0435344991, 2.8), (-40.3645882462, 7.6352787947), (-36.2540901363, 5))
            ThreePointArc((-36.2540901363, 5), (-36.5188113415, 3.7895018901), (-37.2646457735, 2.8))
        make_face(mode=Mode.SUBTRACT)
        with BuildLine():
            ThreePointArc((-37.9666559276, 2.8), (-39.1540901363, 2.5), (-40.341524345, 2.8))
            Line((-40.341524345, 2.8), (-41.0435344991, 2.8))
            ThreePointArc((-41.0435344991, 2.8), (-39.1540901363, 2.1), (-37.2646457735, 2.8))
            Line((-37.2646457735, 2.8), (-37.9666559276, 2.8))
        make_face()
        with BuildLine():
            Line((-37.9666559276, 2.8), (-40.341524345, 2.8))
            ThreePointArc((-40.341524345, 2.8), (-39.1540901363, 2.5), (-37.9666559276, 2.8))
        make_face()
    extrude(amount=F16_DEPTH)

    # F17 (on Top) → F18 (join, two sides)
    with BuildSketch(Plane.XY) as f18_sk:
        with Locations((1.5, -39.1540901363)):
            Circle(F17_R)
    with SkipClean():  # cleaning this boolean's faces spoils the solid; the shape is the same uncleaned
        extrude(amount=F18_DEPTH)
        extrude(f18_sk.sketch, amount=-F18_DEPTH_BACK)


solid = Compound([f1.part, f7.part, f8.part, f11.part, f13.part, f16.part])
